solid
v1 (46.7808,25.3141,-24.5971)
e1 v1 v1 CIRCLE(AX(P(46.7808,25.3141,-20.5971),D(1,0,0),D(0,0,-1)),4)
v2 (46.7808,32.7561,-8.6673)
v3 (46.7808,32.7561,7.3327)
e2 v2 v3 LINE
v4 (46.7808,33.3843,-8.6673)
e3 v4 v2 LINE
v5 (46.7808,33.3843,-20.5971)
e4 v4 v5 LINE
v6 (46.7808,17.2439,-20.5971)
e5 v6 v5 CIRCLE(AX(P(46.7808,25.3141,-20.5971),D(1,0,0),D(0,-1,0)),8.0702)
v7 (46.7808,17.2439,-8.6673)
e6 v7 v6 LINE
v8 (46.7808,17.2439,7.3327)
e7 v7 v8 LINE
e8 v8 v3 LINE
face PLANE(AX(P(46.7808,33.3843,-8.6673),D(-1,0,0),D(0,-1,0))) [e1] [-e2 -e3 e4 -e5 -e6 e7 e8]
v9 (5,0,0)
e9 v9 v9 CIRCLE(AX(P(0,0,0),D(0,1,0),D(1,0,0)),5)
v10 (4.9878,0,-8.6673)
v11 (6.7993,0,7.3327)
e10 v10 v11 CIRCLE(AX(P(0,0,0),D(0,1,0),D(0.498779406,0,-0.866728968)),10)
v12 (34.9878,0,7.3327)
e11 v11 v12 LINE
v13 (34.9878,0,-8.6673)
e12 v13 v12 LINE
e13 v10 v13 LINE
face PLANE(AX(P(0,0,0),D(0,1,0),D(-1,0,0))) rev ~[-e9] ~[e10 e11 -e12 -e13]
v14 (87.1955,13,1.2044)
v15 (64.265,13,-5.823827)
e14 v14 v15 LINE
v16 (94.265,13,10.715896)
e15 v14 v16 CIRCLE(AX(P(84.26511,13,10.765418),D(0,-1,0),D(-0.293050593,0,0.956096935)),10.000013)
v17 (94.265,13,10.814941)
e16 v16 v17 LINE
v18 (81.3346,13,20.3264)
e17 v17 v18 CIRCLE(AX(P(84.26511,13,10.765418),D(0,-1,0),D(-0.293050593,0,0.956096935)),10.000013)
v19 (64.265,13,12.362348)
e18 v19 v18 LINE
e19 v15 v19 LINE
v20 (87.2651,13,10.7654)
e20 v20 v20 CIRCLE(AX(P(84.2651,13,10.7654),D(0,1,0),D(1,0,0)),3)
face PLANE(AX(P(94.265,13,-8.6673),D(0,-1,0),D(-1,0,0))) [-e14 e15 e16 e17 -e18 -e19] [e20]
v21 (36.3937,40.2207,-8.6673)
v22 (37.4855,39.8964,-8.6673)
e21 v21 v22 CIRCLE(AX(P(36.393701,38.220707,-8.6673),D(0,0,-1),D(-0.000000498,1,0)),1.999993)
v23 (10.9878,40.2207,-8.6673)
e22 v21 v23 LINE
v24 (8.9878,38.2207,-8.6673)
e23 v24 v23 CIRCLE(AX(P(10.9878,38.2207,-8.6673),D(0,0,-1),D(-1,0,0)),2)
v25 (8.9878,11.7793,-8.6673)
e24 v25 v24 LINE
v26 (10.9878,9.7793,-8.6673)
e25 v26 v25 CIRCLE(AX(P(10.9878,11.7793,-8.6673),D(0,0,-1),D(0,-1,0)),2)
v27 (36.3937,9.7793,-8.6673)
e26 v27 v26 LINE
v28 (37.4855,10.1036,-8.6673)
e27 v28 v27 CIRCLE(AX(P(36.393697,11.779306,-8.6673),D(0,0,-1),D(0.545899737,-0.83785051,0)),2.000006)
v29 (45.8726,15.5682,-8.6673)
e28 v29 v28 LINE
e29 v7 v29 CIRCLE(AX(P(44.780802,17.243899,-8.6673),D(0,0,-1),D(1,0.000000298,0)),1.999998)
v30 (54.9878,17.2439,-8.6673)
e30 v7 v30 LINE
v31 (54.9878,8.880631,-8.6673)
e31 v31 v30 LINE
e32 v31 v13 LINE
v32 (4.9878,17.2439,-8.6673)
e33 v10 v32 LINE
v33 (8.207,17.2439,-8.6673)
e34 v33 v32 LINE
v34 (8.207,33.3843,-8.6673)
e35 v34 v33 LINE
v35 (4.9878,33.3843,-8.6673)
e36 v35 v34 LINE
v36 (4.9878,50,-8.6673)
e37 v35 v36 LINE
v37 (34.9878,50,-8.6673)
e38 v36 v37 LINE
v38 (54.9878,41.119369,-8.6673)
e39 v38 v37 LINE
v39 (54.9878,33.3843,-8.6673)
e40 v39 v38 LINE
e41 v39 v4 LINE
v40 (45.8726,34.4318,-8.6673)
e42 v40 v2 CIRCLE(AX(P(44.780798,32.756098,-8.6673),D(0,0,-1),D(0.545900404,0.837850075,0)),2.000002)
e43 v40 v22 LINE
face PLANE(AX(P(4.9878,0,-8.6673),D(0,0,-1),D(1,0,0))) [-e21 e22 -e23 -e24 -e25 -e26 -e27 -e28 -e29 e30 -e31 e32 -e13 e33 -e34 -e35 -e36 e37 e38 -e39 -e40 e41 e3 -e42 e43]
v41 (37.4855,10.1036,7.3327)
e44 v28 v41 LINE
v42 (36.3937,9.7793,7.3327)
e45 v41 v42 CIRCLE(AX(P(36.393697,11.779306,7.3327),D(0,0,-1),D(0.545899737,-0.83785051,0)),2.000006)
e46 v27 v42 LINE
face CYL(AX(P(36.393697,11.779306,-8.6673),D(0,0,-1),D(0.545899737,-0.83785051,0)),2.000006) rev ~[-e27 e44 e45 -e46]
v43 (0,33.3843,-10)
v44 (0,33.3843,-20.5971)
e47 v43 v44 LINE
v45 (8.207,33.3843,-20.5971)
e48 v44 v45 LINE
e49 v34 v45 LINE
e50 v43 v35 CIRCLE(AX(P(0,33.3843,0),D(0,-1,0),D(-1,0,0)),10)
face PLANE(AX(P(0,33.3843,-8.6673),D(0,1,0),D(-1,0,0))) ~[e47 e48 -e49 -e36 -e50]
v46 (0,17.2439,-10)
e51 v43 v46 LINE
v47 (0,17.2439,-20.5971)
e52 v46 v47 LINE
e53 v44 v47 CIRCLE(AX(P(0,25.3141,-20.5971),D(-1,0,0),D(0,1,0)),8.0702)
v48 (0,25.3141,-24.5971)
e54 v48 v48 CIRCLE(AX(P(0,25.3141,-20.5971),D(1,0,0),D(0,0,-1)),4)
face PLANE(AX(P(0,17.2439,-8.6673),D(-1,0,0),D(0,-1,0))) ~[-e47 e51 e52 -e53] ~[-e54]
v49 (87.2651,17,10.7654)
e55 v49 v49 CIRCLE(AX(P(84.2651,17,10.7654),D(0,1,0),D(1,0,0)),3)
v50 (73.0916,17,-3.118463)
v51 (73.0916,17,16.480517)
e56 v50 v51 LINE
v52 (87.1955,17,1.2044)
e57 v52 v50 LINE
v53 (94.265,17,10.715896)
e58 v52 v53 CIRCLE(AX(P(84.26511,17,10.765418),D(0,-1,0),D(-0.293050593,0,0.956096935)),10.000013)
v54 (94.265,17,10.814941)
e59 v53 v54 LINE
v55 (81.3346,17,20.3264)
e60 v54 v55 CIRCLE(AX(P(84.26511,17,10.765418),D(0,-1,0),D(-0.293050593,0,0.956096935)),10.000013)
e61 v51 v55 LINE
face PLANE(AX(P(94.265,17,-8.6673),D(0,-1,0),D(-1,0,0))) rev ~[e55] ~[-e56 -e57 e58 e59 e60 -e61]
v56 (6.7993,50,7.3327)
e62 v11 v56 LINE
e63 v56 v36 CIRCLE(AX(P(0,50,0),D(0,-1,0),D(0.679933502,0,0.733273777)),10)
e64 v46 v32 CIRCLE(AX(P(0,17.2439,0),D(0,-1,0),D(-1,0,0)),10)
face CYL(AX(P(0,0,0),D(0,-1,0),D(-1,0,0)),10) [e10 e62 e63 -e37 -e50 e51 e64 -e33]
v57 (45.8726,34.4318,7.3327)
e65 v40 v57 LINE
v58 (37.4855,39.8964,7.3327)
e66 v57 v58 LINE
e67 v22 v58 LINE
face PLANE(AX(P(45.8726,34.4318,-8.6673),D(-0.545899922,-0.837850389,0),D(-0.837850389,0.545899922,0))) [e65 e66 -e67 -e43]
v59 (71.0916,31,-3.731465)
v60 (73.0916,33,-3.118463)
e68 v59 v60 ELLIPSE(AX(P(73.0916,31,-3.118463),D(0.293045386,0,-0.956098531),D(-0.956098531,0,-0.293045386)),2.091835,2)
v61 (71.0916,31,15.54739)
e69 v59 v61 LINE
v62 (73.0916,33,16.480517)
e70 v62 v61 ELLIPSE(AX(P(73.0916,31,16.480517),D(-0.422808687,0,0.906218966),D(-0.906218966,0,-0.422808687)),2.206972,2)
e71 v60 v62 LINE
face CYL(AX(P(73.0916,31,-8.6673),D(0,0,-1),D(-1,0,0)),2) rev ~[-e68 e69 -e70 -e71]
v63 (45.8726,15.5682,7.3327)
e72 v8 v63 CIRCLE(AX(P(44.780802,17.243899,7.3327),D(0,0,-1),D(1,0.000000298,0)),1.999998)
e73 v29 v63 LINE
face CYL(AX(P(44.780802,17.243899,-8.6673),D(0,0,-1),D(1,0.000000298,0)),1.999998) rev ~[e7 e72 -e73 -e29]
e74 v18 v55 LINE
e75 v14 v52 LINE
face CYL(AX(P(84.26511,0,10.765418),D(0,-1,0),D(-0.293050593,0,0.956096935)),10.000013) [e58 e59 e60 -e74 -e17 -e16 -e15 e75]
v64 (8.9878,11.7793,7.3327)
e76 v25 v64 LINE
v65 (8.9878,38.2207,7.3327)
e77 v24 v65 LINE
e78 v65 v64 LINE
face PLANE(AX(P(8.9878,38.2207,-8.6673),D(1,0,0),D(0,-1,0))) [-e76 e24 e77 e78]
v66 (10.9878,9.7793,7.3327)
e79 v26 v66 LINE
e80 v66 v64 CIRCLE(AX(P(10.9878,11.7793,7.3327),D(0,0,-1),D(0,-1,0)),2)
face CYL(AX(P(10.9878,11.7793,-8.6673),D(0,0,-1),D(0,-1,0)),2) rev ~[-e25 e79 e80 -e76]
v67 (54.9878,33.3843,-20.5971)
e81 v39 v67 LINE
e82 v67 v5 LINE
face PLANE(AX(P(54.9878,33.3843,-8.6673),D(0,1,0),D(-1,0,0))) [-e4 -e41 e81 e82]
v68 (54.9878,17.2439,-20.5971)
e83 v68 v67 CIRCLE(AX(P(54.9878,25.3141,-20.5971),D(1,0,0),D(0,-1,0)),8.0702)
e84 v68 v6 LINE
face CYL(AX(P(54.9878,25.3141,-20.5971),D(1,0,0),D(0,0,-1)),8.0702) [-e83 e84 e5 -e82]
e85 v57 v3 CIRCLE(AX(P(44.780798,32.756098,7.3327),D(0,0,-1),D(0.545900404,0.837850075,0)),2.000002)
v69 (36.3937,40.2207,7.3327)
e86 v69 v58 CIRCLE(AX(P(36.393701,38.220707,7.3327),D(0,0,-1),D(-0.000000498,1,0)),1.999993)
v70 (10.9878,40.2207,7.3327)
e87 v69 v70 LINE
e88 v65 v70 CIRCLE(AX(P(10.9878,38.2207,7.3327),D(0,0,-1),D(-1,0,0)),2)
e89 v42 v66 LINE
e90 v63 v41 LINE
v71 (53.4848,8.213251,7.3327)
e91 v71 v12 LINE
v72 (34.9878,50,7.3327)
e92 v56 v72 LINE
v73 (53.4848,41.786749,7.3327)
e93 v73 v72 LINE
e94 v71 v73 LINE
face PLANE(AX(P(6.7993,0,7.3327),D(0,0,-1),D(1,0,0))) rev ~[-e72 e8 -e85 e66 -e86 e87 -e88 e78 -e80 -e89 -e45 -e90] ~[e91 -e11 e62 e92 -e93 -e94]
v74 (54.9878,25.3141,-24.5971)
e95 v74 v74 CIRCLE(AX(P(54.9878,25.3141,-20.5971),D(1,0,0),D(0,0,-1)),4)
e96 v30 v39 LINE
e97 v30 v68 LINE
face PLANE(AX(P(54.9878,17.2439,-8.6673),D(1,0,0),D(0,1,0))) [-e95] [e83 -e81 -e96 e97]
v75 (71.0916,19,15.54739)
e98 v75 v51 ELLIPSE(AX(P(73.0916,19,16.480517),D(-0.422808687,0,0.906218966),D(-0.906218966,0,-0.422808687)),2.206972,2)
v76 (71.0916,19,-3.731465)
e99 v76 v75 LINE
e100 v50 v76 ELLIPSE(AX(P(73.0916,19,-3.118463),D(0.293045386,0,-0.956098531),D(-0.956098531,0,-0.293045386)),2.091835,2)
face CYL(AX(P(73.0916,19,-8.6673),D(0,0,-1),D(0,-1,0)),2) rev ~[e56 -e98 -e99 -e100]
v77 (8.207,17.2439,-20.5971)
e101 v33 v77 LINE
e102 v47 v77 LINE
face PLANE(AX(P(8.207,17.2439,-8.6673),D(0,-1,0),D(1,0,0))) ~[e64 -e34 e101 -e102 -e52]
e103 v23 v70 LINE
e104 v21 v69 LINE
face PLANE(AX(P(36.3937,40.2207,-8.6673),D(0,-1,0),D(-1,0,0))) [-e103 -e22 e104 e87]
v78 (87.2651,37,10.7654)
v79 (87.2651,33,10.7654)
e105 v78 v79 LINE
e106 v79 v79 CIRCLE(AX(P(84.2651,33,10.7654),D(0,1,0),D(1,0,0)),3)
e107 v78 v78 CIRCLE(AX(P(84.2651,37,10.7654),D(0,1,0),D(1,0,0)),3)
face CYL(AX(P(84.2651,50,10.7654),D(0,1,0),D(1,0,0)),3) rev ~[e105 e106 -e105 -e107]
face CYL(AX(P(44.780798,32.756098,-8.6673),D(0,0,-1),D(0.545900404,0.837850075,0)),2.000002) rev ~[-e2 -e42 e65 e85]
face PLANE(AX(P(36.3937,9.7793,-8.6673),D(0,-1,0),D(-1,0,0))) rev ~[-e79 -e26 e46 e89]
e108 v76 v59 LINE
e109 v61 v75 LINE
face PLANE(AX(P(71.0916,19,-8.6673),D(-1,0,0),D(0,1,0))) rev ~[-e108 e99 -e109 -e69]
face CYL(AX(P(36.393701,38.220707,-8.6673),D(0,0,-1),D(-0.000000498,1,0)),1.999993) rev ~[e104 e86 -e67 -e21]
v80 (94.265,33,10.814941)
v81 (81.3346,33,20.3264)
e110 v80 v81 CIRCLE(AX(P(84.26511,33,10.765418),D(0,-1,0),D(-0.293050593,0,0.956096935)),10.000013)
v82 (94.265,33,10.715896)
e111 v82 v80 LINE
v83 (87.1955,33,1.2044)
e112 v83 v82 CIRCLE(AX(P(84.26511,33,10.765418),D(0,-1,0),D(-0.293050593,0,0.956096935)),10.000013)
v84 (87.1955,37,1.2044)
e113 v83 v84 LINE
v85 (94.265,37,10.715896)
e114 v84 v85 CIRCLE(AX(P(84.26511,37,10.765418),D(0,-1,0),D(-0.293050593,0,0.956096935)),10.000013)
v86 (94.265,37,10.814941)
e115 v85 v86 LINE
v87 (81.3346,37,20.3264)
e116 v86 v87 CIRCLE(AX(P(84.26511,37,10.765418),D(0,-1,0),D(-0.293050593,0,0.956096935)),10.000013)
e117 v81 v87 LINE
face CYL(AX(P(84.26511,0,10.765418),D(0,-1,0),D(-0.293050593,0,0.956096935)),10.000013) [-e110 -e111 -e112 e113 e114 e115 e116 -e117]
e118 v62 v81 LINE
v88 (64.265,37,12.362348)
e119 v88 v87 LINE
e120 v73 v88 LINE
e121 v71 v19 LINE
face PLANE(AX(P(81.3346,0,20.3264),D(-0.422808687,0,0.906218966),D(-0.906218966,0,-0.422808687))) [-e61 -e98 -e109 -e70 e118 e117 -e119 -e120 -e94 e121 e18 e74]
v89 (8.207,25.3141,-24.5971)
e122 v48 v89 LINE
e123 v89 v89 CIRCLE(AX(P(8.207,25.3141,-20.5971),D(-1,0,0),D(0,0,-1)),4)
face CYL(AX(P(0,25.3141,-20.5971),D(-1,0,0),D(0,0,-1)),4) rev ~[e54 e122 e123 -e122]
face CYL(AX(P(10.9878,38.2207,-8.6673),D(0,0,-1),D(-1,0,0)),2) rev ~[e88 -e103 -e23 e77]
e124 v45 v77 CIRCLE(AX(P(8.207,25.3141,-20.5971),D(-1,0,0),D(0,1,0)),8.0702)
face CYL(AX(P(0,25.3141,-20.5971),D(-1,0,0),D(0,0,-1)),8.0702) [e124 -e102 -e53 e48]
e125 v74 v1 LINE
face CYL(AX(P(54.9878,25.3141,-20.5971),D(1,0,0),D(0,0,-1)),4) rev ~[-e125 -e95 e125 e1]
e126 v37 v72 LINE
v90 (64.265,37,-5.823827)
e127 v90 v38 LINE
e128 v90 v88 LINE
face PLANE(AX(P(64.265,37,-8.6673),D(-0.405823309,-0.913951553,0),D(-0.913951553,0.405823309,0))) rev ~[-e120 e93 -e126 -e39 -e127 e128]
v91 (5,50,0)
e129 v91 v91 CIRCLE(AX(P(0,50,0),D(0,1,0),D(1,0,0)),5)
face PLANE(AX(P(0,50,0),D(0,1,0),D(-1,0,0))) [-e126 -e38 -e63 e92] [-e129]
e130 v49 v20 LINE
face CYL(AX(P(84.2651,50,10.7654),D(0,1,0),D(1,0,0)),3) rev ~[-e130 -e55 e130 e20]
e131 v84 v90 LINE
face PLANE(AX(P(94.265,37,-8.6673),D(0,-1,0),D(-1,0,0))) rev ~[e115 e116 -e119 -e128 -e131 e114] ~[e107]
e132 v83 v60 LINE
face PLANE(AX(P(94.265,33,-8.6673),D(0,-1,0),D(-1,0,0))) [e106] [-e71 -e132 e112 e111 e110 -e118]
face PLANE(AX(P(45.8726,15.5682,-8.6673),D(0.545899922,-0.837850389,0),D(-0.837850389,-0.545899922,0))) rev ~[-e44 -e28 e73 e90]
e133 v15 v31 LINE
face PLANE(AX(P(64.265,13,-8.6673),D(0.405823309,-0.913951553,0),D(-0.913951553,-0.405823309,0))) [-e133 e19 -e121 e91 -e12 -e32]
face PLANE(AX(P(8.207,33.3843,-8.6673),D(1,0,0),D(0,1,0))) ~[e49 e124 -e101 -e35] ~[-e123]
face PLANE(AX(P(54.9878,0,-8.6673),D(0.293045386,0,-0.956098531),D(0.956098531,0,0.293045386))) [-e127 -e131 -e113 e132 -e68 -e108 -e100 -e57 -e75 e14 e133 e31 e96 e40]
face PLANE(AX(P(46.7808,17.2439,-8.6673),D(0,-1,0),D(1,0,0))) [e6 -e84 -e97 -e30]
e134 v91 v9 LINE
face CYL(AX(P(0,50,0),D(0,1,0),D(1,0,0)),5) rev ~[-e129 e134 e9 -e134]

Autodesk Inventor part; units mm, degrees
sketch "Boceto1" plane through (0, 0, 0) normal (0, 1, 0) x (-1, 0, 0)
  circle A0 centre (0, 0) radius 10
  line L0 (-4.9878, -8.6673) -> (-54.9878, -8.6673)
  line L1 (-6.7993, 7.3327) -> (-53.4848, 7.3327)
  line L2 (-54.9878, -8.6673) -> (-87.1955, 1.2044)
  arc A1 (-81.3346, 20.3264) -> (-87.1955, 1.2044) centre (-84.2651, 10.7654) ccw
  line L3 (-81.3346, 20.3264) -> (-53.4848, 7.3327)
  dimension "d0" = 20
  dimension "d1" = 16
  dimension "d2" = 10
  dimension "d3" = 50
  dimension "d25" = 154.988
extrude "Extrusión1" add sketch "Boceto1" along normal blind 50
sketch "Boceto2" plane through (54.9878, 0, -8.6673) normal (0, 0, -1) x (-1, 0, 0)
  line L0 (-39.2772, 0) -> (-39.2772, 50) projected
  line L1 (-32.2077, 50) -> (0, 50) projected
  line L2 (-32.2077, 0) -> (0, 0) projected
  line L3 (0, 0) -> (50, 0) projected
  line L4 (0, 50) -> (50, 50) projected
  line L5 (92.4078, 25) -> (-89.4019, 25)
  line L6 (-39.2772, 17) -> (-18.1038, 17)
  line L7 (-16.1038, 19) -> (-16.1038, 25)
  line L8 (-39.2772, 13) -> (-9.2772, 13)
  line L9 (-9.2772, 13) -> (20, 0)
  line L10 (48.1885, 0) -> (1.503, 0) projected
  line L11 (8.207, 25) -> (8.207, 17.2439)
  line L12 (9.1152, 15.5682) -> (17.5023, 10.1036)
  line L13 (18.5941, 9.7793) -> (44, 9.7793)
  line L14 (46, 11.7793) -> (46, 25)
  line L15 (50, 0) -> (20, 0)
  line L16 (64.9878, 0) -> (48.1885, 0) projected
  line L17 (50, 50) -> (50, 0) projected
  arc A0 (-18.1038, 17) -> (-16.1038, 19) centre (-18.1038, 19) ccw
  arc A1 (8.207, 17.2439) -> (9.1152, 15.5682) centre (10.207, 17.2439) ccw
  arc A2 (17.5023, 10.1036) -> (18.5941, 9.7793) centre (18.5941, 11.7793) ccw
  arc A3 (44, 9.7793) -> (46, 11.7793) centre (44, 11.7793) ccw
  line L18 (20, 0) -> (-39.2772, 0)
  line L19 (-26.3468, 0) -> (-39.2772, 0) projected
  line L20 (-39.2772, 17) -> (-39.2772, 25)
  line L21 (0, 50) -> (50, 50)
  line L22 (-39.2772, 33) -> (-18.1038, 33)
  line L23 (-16.1038, 31) -> (-16.1038, 25)
  line L24 (-39.2772, 37) -> (-9.2772, 37)
  line L25 (-9.2772, 37) -> (20, 50)
  line L26 (48.1885, 50) -> (1.503, 50)
  line L27 (8.207, 25) -> (8.207, 32.7561)
  line L28 (9.1152, 34.4318) -> (17.5023, 39.8964)
  line L29 (18.5941, 40.2207) -> (44, 40.2207)
  line L30 (46, 38.2207) -> (46, 25)
  line L31 (50, 0) -> (50, 50)
  arc A4 (-16.1038, 31) -> (-18.1038, 33) centre (-18.1038, 31) ccw
  arc A5 (9.1152, 34.4318) -> (8.207, 32.7561) centre (10.207, 32.7561) ccw
  arc A6 (18.5941, 40.2207) -> (17.5023, 39.8964) centre (18.5941, 38.2207) ccw
  arc A7 (46, 38.2207) -> (44, 40.2207) centre (44, 38.2207) ccw
  line L32 (20, 50) -> (-39.2772, 50)
  line L33 (-39.2772, 50) -> (-39.2772, 37)
  line L34 (-39.2772, 33) -> (-39.2772, 17)
  line L35 (-39.2772, 13) -> (-39.2772, 0)
  point P0 (54.9878, 0)
  point P1 (1.503, 25)
  point P2 (18, 9.7793)
  point P3 (46, 9.7793)
  dimension "d6" = 12
  dimension "d7" = 4
  dimension "d8" = 30
  dimension "d9" = 30
  dimension "d10" = 28
  dimension "d11" = 4
  dimension "d12" = 2
extrude "Extrusión2" cut sketch "Boceto2" against normal through all contours L0 L8 L9 L3 L2 L18 | L0 L5 L7 A0 L6 | L0 L22 A4 L23 L5 | L0 L32 L1 L4 L25 L24 | L27 A5 L28 A6 L29 A7 L30 L5 | L5 L14 A3 L13 A2 L12 A1 L11
sketch "Boceto3" plane through (0, 50, 0) normal (0, 1, 0) x (1, 0, 0)
  circle A0 centre (0, 0) radius 5
  arc A1 (81.3346, -20.3264) -> (87.1955, -1.2044) centre (84.2651, -10.7654) ccw projected
  circle A2 centre (84.2651, -10.7654) radius 3
  dimension "d15" = 10
  dimension "d16" = 6
extrude "Extrusión3" cut sketch "Boceto3" against normal through all
sketch "Boceto4" plane through (4.9878, 0, -8.6673) normal (0, 0, -1) x (-1, 0, 0)
  line L0 (-50, 8.8806) -> (-50, 41.1194) projected
  line L1 (-41.793, 17.2439) -> (-50, 17.2439)
  line L2 (-50, 17.2439) -> (-50, 33.3843)
  line L3 (-50, 33.3843) -> (-41.793, 33.3843)
  line L4 (-41.793, 33.3843) -> (-41.793, 17.2439)
  point P0 (4.9878, 0)
extrude "Extrusión4" add sketch "Boceto4" along normal blind 20
sketch "Boceto5" plane through (54.9878, 17.2439, -8.6673) normal (1, 0, 0) x (0, 0, -1)
  line L0 (20, 16.1404) -> (20, 0) projected
  line L1 (0, 16.1404) -> (20, 16.1404) projected
  line L2 (0, 0) -> (20, 0) projected
  circle A0 centre (11.9298, 8.0702) radius 8.0702
  line L3 (11.9298, 16.1404) -> (20, 16.1404)
  line L4 (20, 16.1404) -> (20, 8.0702)
  line L5 (20, 8.0702) -> (20, 0)
  line L6 (20, 0) -> (11.9298, 0)
  circle A1 centre (11.9298, 8.0702) radius 4
  point P0 (-8.6673, -17.2439)
  dimension "d21" = 8
extrude "Extrusión5" cut sketch "Boceto5" against normal up to next contours L0 A0 L1 | L0 L2 A0 | A1
ref_plane "Plano de trabajo1" through (54.9878, 17.2439, -20.5971) normal (1, 0, 0) x (0, 0, -1)
ref_plane "Plano de trabajo3" through (27.4939, 50, 0) normal (1, 0, 0) x (0, -1, 0)
ref_plane "Plano de trabajo2" through (0, 50, 0) normal (1, 0, 0) x (0, -1, 0)
mirror "Simetría1" about plane through (27.4939, 50, 0) normal (1, 0, 0) of "Extrusión5", "Extrusión4"
ref_plane "Plano de trabajo6" through (46.7808, 33.3843, -20.5971) normal (-1, 0, 0) x (0, 0, 1)
properties part number "wheel_holder" material "Acero inoxidable, austenítico"
